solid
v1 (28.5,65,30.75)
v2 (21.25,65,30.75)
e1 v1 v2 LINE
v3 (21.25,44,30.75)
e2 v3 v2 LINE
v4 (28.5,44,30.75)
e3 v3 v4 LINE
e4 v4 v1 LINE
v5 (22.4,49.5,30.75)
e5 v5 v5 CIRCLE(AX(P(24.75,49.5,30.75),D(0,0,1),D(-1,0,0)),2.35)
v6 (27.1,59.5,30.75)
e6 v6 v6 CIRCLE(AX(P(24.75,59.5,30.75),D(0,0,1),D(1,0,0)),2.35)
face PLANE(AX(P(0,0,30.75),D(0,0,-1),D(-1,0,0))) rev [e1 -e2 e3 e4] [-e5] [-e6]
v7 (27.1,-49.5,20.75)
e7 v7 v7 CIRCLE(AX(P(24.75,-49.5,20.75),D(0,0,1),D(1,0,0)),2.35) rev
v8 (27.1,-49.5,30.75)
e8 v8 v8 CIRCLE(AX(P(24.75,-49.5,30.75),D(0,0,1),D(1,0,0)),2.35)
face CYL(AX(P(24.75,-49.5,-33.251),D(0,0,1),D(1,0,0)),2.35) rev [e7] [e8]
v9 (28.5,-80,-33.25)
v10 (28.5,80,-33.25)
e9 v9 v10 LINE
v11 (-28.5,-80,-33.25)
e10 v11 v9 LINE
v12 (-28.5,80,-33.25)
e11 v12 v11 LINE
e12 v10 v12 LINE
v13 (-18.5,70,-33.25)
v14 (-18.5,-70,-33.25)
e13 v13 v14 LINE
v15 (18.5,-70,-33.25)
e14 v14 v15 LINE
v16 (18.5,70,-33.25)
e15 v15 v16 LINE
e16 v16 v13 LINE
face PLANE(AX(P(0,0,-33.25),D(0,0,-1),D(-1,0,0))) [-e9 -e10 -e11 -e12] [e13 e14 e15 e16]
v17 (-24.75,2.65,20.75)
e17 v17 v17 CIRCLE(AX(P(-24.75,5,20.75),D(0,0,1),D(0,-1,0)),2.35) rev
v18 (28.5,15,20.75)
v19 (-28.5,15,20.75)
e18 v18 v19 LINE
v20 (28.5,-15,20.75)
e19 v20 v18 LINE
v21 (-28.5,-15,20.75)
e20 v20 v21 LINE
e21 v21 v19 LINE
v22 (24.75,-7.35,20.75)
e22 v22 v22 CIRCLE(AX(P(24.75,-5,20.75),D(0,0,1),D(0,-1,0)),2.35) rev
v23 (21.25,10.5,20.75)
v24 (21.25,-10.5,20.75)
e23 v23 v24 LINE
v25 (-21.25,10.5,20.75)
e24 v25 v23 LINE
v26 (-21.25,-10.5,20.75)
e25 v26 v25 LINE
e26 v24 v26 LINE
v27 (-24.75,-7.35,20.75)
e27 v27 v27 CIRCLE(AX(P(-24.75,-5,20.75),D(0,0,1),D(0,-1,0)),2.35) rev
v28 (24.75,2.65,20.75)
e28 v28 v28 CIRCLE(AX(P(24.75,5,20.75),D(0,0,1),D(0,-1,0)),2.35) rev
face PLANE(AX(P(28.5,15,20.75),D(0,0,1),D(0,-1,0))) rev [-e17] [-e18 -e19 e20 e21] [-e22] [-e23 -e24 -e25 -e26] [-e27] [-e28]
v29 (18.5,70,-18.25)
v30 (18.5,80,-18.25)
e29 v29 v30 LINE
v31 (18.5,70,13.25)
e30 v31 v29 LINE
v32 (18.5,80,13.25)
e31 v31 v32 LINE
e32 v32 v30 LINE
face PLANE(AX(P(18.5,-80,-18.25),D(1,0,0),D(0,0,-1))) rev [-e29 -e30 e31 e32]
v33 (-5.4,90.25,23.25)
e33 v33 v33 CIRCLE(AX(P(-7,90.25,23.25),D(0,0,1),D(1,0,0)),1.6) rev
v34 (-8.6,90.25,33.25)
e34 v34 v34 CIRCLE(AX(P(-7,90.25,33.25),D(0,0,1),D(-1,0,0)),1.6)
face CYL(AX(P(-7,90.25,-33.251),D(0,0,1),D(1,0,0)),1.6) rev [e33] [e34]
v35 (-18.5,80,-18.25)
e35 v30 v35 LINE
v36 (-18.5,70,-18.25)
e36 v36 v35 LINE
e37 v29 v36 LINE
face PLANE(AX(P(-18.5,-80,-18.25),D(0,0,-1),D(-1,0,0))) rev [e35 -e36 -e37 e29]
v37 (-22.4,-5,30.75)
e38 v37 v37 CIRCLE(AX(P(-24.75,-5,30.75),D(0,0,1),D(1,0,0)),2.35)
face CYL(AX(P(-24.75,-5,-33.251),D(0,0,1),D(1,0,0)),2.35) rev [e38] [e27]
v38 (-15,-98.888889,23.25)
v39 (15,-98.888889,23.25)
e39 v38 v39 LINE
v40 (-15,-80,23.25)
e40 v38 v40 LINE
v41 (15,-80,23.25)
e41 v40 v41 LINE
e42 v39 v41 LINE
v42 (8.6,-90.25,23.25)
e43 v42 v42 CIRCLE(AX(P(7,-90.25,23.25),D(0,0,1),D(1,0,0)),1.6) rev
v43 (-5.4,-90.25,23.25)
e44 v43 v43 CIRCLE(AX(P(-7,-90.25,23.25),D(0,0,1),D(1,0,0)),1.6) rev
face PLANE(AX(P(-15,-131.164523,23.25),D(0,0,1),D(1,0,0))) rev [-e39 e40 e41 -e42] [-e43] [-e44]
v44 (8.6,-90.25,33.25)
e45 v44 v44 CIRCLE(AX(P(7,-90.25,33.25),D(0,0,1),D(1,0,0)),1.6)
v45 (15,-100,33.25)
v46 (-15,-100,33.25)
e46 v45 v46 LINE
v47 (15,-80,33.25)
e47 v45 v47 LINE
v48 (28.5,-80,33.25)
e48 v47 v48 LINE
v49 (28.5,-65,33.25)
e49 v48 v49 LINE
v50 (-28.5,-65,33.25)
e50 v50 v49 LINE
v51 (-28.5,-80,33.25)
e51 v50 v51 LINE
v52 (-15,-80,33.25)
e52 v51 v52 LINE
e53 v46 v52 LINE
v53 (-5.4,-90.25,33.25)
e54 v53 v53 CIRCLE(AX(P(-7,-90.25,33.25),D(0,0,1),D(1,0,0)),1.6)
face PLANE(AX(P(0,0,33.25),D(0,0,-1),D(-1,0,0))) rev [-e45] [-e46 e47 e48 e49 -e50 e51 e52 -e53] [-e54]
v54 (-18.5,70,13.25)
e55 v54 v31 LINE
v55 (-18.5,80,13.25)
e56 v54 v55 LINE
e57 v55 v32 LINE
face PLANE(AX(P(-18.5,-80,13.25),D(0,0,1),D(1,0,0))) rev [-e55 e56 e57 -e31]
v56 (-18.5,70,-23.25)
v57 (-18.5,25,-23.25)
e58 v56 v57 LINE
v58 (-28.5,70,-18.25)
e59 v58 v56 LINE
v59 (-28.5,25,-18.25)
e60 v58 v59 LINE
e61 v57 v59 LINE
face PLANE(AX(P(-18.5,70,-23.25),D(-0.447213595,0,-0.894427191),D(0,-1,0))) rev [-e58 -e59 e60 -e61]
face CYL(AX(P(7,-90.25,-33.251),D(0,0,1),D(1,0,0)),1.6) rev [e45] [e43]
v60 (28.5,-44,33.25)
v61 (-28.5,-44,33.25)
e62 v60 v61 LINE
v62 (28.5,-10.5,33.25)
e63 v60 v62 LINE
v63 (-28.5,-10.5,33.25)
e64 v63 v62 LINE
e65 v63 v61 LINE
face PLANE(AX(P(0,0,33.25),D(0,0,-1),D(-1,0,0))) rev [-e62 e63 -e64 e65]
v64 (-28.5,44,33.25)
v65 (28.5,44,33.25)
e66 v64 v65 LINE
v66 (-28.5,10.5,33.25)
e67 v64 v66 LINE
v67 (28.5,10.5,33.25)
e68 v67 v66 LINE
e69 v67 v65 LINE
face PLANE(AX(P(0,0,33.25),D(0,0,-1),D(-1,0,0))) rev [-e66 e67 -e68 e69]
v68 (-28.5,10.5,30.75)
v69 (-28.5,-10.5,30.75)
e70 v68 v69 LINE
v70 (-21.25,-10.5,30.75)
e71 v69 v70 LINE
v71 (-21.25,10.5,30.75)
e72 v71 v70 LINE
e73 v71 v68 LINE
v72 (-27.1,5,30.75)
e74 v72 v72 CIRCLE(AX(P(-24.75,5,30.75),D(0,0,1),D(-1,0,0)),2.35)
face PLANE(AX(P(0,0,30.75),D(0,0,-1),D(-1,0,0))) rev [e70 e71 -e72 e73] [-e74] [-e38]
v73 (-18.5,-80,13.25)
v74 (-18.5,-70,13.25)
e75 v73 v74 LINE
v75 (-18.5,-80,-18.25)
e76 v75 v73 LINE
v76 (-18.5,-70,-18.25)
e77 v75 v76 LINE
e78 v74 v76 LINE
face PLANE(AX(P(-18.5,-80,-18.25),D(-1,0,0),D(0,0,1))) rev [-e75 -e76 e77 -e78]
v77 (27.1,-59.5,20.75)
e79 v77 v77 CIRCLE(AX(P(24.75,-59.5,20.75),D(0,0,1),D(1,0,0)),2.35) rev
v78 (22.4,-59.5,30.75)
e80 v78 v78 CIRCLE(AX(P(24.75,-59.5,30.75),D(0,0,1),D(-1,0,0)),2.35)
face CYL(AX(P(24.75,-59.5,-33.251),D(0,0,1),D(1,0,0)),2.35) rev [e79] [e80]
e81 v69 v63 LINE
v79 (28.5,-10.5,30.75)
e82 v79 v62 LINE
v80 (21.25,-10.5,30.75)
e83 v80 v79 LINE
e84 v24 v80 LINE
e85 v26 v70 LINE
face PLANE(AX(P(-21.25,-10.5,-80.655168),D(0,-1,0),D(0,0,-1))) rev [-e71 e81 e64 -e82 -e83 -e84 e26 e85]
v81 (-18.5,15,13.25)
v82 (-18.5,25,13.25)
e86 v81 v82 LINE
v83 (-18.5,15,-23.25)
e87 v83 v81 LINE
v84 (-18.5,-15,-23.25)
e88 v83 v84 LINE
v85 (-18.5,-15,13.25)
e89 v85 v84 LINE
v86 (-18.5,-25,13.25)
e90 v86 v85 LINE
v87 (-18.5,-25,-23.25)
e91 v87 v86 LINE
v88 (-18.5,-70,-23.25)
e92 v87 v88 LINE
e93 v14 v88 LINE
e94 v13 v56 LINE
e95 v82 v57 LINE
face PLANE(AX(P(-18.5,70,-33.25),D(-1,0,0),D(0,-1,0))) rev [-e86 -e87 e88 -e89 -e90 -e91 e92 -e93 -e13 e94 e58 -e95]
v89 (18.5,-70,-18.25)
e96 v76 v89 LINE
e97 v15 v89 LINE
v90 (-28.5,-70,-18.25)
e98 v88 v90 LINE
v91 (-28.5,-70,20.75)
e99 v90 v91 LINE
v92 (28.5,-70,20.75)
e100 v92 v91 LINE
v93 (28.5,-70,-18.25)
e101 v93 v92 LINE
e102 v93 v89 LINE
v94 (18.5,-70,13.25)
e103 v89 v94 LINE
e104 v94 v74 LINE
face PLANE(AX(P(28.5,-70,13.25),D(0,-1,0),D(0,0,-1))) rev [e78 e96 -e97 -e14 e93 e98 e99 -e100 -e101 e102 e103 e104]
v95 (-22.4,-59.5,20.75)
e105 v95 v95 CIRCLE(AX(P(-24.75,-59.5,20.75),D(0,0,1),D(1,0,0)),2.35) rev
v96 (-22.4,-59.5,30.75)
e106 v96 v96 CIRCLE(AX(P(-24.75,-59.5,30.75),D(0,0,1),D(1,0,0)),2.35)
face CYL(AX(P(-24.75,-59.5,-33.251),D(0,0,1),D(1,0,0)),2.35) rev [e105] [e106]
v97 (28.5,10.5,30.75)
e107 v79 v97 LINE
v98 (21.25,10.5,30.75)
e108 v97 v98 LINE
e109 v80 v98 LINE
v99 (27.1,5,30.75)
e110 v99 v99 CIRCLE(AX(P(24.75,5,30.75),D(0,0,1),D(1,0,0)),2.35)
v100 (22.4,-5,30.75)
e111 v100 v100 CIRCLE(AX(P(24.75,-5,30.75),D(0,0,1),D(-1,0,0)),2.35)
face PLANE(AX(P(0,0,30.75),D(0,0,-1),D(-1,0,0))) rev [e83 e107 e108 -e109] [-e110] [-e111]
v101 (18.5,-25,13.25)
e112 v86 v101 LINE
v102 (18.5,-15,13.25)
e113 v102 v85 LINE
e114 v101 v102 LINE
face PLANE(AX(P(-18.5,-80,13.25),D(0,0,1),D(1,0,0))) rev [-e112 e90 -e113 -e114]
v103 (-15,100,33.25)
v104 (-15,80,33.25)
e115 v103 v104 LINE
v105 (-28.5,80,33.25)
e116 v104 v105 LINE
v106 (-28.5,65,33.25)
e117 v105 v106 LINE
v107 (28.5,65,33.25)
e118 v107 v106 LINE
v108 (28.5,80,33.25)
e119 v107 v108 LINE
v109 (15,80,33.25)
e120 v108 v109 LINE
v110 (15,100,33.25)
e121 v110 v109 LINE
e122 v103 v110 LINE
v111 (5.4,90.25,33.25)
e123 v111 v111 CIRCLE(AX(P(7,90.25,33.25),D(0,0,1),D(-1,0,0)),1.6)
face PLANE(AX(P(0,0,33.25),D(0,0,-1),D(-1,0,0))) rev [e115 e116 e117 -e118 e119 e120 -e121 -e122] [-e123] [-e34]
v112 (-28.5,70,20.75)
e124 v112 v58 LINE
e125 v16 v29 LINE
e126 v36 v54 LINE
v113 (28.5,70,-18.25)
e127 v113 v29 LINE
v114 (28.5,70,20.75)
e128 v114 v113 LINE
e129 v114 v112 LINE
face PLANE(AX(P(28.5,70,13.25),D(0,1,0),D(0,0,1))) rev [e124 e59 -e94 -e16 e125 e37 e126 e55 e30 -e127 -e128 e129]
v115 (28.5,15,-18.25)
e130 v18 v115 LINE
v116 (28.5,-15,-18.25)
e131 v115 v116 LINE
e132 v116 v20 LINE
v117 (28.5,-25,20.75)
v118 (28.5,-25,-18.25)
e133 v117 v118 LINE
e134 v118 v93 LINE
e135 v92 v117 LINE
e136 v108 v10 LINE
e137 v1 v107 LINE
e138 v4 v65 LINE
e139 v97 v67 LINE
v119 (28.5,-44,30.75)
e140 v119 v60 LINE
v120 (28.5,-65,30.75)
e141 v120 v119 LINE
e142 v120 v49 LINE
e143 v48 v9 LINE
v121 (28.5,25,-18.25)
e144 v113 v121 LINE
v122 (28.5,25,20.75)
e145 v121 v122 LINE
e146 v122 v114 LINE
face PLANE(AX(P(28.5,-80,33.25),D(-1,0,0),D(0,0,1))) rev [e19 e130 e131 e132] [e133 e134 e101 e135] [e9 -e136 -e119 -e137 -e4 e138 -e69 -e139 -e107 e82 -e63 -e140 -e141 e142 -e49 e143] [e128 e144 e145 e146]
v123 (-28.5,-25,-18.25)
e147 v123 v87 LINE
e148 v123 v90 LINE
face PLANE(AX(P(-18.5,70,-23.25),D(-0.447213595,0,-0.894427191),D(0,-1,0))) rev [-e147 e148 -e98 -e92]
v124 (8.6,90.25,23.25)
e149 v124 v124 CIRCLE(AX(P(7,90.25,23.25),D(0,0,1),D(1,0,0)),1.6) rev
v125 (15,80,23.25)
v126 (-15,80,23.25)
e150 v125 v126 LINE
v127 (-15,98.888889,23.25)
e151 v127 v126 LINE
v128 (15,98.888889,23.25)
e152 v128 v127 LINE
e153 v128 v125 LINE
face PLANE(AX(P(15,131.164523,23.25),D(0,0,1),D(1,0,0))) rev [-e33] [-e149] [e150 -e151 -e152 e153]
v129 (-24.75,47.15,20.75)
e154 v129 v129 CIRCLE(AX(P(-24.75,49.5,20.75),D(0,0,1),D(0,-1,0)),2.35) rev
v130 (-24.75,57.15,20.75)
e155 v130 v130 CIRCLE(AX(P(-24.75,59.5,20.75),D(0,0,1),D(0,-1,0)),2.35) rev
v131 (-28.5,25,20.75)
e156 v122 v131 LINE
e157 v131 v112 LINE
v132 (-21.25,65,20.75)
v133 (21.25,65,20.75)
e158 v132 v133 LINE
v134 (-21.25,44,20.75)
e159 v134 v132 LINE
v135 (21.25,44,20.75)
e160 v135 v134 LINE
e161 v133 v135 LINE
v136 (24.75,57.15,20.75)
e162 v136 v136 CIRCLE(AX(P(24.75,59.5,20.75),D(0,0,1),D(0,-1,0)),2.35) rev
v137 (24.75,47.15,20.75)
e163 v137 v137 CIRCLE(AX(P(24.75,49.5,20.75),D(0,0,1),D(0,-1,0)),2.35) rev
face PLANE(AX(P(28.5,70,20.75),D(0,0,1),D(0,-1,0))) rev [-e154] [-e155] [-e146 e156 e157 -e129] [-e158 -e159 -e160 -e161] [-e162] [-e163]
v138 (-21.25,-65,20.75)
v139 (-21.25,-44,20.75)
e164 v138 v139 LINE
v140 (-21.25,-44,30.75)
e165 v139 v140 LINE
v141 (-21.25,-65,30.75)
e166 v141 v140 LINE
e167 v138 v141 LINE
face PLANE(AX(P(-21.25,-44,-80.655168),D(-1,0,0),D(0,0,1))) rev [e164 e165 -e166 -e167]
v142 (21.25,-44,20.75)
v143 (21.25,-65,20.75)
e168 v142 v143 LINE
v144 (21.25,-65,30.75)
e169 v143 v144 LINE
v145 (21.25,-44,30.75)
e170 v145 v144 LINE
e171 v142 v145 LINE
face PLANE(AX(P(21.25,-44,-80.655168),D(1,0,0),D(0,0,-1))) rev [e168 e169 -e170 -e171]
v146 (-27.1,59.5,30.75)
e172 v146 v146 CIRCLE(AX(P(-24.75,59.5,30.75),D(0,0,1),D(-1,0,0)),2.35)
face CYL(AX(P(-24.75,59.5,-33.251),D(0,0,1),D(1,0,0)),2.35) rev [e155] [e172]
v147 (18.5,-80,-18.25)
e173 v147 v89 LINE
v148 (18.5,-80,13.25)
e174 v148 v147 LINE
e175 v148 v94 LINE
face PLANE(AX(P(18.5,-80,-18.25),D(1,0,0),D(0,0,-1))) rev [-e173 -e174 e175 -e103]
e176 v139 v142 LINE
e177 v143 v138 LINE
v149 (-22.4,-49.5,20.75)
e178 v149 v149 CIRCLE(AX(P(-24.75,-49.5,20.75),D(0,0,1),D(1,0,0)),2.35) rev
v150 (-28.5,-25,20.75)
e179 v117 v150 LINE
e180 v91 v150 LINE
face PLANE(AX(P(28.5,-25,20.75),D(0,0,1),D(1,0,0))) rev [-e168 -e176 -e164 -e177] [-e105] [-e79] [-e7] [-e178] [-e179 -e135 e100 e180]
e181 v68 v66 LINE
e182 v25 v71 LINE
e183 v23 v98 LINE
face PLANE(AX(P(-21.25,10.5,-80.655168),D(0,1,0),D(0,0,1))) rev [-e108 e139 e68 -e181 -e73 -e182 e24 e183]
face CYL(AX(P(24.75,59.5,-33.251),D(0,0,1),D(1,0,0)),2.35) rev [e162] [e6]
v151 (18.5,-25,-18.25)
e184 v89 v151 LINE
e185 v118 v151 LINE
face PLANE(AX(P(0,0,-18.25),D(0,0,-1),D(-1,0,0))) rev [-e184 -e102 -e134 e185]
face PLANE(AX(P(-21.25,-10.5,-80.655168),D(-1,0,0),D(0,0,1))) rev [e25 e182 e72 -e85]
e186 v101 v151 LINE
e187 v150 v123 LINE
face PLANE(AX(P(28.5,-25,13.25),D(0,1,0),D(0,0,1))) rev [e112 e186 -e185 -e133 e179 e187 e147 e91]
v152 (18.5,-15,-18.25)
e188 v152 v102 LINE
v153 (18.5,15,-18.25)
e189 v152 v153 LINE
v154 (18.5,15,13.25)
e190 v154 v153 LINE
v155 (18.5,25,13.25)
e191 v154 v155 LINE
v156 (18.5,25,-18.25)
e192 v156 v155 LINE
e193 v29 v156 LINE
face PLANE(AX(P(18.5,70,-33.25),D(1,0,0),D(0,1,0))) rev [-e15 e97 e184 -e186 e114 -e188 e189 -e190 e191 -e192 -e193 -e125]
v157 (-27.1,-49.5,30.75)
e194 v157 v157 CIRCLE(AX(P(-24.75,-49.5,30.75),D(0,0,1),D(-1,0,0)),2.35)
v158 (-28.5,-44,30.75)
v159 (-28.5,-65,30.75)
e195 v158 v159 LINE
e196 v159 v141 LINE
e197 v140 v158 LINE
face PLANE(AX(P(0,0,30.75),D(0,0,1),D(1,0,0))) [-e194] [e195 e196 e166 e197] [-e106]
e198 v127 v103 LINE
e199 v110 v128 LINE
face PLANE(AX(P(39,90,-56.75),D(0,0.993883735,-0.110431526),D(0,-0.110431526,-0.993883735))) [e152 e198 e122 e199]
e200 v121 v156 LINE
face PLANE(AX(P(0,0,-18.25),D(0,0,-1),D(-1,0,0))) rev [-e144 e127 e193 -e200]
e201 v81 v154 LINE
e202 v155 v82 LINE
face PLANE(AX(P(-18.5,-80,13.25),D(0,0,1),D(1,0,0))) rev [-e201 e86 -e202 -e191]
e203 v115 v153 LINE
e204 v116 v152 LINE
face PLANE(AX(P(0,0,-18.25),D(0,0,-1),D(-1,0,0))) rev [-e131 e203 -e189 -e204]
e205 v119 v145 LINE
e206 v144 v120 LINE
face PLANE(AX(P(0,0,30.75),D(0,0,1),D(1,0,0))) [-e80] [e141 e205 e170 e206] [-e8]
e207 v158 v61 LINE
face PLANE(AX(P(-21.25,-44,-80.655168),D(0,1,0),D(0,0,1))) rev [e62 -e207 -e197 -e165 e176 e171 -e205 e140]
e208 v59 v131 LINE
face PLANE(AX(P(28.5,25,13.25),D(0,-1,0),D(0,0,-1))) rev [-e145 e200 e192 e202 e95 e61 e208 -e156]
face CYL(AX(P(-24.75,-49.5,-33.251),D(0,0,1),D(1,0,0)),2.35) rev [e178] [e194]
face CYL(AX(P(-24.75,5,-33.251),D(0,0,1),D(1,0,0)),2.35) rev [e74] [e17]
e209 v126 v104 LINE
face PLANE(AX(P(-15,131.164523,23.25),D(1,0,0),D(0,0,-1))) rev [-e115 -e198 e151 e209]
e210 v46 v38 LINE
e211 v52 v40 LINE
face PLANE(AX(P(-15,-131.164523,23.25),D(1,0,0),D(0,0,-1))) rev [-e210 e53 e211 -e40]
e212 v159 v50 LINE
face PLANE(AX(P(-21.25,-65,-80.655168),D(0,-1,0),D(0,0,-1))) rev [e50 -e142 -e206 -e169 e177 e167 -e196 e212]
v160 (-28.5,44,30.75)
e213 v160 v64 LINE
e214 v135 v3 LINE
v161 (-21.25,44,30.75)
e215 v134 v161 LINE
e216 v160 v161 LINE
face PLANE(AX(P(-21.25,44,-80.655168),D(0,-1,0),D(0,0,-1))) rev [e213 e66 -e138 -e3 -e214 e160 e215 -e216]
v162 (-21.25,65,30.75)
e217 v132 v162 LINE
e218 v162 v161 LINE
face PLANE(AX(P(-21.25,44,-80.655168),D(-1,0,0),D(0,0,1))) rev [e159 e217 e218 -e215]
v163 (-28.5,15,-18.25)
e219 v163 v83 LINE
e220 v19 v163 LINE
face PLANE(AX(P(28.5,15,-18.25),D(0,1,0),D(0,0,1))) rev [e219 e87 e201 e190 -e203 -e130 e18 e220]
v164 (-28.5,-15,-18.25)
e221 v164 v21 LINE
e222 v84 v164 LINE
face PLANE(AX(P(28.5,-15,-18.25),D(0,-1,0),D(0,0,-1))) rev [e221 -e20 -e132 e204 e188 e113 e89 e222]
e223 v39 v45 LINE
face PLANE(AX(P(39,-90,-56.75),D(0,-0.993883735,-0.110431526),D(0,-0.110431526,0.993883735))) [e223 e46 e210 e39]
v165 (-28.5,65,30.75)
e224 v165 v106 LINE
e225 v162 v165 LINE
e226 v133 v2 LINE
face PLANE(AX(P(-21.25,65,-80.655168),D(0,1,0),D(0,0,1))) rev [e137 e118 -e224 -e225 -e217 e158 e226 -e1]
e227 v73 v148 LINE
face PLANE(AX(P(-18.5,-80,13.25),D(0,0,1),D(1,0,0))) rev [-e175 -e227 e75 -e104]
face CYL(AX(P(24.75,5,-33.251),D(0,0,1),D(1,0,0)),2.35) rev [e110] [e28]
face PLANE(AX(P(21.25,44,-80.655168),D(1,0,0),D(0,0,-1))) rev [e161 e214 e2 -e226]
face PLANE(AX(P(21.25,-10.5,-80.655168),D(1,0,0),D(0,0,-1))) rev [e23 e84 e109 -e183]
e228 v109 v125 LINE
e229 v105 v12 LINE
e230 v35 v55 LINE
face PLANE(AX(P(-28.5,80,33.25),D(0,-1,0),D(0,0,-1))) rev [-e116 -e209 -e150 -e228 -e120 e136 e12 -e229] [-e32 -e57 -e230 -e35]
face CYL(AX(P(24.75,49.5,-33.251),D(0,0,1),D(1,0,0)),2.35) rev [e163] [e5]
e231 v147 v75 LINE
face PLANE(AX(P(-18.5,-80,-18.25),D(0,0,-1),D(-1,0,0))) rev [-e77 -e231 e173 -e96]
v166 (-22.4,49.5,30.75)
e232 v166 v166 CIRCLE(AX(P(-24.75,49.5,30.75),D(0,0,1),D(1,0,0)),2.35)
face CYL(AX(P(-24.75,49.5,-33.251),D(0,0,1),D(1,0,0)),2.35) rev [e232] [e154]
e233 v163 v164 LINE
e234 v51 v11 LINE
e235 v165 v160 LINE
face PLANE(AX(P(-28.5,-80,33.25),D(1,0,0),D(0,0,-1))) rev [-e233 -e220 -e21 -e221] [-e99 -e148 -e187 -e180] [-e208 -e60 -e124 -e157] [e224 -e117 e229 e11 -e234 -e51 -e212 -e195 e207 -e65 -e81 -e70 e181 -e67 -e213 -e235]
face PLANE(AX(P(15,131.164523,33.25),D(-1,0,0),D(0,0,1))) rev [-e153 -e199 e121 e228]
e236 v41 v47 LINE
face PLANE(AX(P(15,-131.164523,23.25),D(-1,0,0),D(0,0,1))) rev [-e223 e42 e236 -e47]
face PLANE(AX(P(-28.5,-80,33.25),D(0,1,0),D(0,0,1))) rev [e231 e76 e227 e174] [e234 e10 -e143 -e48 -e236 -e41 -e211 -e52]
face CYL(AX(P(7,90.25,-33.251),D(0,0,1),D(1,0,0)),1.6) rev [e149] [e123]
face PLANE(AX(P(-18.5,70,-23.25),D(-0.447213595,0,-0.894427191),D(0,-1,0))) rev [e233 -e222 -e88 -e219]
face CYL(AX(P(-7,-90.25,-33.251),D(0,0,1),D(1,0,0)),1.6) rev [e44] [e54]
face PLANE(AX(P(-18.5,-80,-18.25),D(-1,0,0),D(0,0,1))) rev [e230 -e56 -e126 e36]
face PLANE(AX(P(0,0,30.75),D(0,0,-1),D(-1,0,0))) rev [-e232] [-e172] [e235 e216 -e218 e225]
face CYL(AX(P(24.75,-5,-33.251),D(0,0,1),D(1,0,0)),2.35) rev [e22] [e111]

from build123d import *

# Parameters (mm, degrees)
SKETCH1_W           = 57
SKETCH1_H           = 160
BOSS_EXTRUDE1_DEPTH = 33.25
SKETCH2_W           = 42.5
SKETCH2_H           = 21
CUT_EXTRUDE1_DEPTH  = 51.5
SKETCH3_W           = 31.5
SKETCH3_H           = 45
SKETCH3_H_2         = 30
CUT_EXTRUDE2_DEPTH  = 104.704206761
SKETCH4_W           = 37
SKETCH4_H           = 140
CUT_EXTRUDE3_DEPTH  = 100.320189287
SKETCH5_W           = 57
SKETCH5_H           = 21
CUT_EXTRUDE4_DEPTH  = 2.5
SKETCH37_W          = 39
SKETCH37_H          = 45
SKETCH37_H_2        = 30
CUT_EXTRUDE10_DEPTH = 104.704206761
CUT_EXTRUDE6_REACH  = 108.34
SKETCH6_R           = 2.35
SKETCH8_W           = 37
SKETCH8_H           = 31.5
CUT_EXTRUDE7_DEPTH  = 166.884937532
BOSS_EXTRUDE3_REACH = 167.885
SKETCH11_W          = 30
SKETCH11_H          = 10
BOSS_EXTRUDE4_REACH = 187.251
SKETCH13_W          = 30
SKETCH13_H          = 10
CUT_EXTRUDE9_REACH  = 125.428
SKETCH12_R          = 1.6
CHAMFER1_SIZE       = 10
CHAMFER1_SIZE_2     = 5


with BuildPart() as part:
    # Sketch1 → Boss-Extrude1 (new, symmetric)
    with BuildSketch(Plane.XY):
        Rectangle(SKETCH1_W, SKETCH1_H)
    extrude(amount=BOSS_EXTRUDE1_DEPTH, both=True)

    # Sketch2 → Cut-Extrude1 (cut)
    with BuildSketch(Plane.XY.offset(33.25)):
        with Locations((0, 54.5)):
            Rectangle(SKETCH2_W, SKETCH2_H)
        Rectangle(SKETCH2_W, SKETCH2_H)
        with Locations((0, -54.5)):
            Rectangle(SKETCH2_W, SKETCH2_H)
    extrude(amount=-CUT_EXTRUDE1_DEPTH, mode=Mode.SUBTRACT)

    # Sketch3 → Cut-Extrude2 (cut, through all)
    with BuildSketch(Plane.ZY.offset(28.5)):
        with Locations((-2.5, -47.5)):
            Rectangle(SKETCH3_W, SKETCH3_H)
        with Locations((-2.5, 0)):
            Rectangle(SKETCH3_W, SKETCH3_H_2)
        with Locations((-2.5, 47.5)):
            Rectangle(SKETCH3_W, SKETCH3_H)
    extrude(amount=-CUT_EXTRUDE2_DEPTH, mode=Mode.SUBTRACT)

    # Sketch4 → Cut-Extrude3 (cut, through all)
    with BuildSketch(Plane.XY.offset(-18.25)):
        Rectangle(SKETCH4_W, SKETCH4_H)
    extrude(amount=-CUT_EXTRUDE3_DEPTH, mode=Mode.SUBTRACT)

    # Sketch5 → Cut-Extrude4 (cut)
    with BuildSketch(Plane.XY.offset(33.25)):
        Rectangle(SKETCH5_W, SKETCH5_H)
        with Locations((0, 54.5)):
            Rectangle(SKETCH5_W, SKETCH5_H)
        with Locations((0, -54.5)):
            Rectangle(SKETCH5_W, SKETCH5_H)
    extrude(amount=-CUT_EXTRUDE4_DEPTH, mode=Mode.SUBTRACT)

    # Sketch37 → Cut-Extrude10 (cut, through all)
    with BuildSketch(Plane.ZY.offset(28.5)):
        with Locations((1.25, 47.5)):
            Rectangle(SKETCH37_W, SKETCH37_H)
        with Locations((1.25, 0)):
            Rectangle(SKETCH37_W, SKETCH37_H_2)
        with Locations((1.25, -47.5)):
            Rectangle(SKETCH37_W, SKETCH37_H)
    extrude(amount=-CUT_EXTRUDE10_DEPTH, mode=Mode.SUBTRACT)

    # Sketch6 → Cut-Extrude6 (cut, up to next)
    with BuildSketch(Plane.XY.offset(30.75), mode=Mode.PRIVATE) as cut_extrude6_sk1:
        with Locations((24.75, 5)):
            Circle(SKETCH6_R)
    cut_extrude6_tool1 = extrude(cut_extrude6_sk1.sketch, amount=-CUT_EXTRUDE6_REACH, mode=Mode.PRIVATE) & part.part
    # Sketch6 → Cut-Extrude6 (cut, up to next)
    with BuildSketch(Plane.XY.offset(30.75), mode=Mode.PRIVATE) as cut_extrude6_sk2:
        with Locations(Location((-24.75, 5, 0), (0, 0, 270))):
            Circle(SKETCH6_R)
    cut_extrude6_tool2 = extrude(cut_extrude6_sk2.sketch, amount=-CUT_EXTRUDE6_REACH, mode=Mode.PRIVATE) & part.part
    # Sketch6 → Cut-Extrude6 (cut, up to next)
    with BuildSketch(Plane.XY.offset(30.75), mode=Mode.PRIVATE) as cut_extrude6_sk3:
        with Locations((-24.75, -5)):
            Circle(SKETCH6_R)
    cut_extrude6_tool3 = extrude(cut_extrude6_sk3.sketch, amount=-CUT_EXTRUDE6_REACH, mode=Mode.PRIVATE) & part.part
    # Sketch6 → Cut-Extrude6 (cut, up to next)
    with BuildSketch(Plane.XY.offset(30.75), mode=Mode.PRIVATE) as cut_extrude6_sk4:
        with Locations(Location((24.75, -5, 0), (0, 0, 270))):
            Circle(SKETCH6_R)
    cut_extrude6_tool4 = extrude(cut_extrude6_sk4.sketch, amount=-CUT_EXTRUDE6_REACH, mode=Mode.PRIVATE) & part.part
    # Sketch6 → Cut-Extrude6 (cut, up to next)
    with BuildSketch(Plane.XY.offset(30.75), mode=Mode.PRIVATE) as cut_extrude6_sk5:
        with Locations((24.75, 59.5)):
            Circle(SKETCH6_R)
    cut_extrude6_tool5 = extrude(cut_extrude6_sk5.sketch, amount=-CUT_EXTRUDE6_REACH, mode=Mode.PRIVATE) & part.part
    # Sketch6 → Cut-Extrude6 (cut, up to next)
    with BuildSketch(Plane.XY.offset(30.75), mode=Mode.PRIVATE) as cut_extrude6_sk6:
        with Locations(Location((-24.75, 59.5, 0), (0, 0, 270))):
            Circle(SKETCH6_R)
    cut_extrude6_tool6 = extrude(cut_extrude6_sk6.sketch, amount=-CUT_EXTRUDE6_REACH, mode=Mode.PRIVATE) & part.part
    # Sketch6 → Cut-Extrude6 (cut, up to next)
    with BuildSketch(Plane.XY.offset(30.75), mode=Mode.PRIVATE) as cut_extrude6_sk7:
        with Locations((-24.75, 49.5)):
            Circle(SKETCH6_R)
    cut_extrude6_tool7 = extrude(cut_extrude6_sk7.sketch, amount=-CUT_EXTRUDE6_REACH, mode=Mode.PRIVATE) & part.part
    # Sketch6 → Cut-Extrude6 (cut, up to next)
    with BuildSketch(Plane.XY.offset(30.75), mode=Mode.PRIVATE) as cut_extrude6_sk8:
        with Locations(Location((24.75, 49.5, 0), (0, 0, 270))):
            Circle(SKETCH6_R)
    cut_extrude6_tool8 = extrude(cut_extrude6_sk8.sketch, amount=-CUT_EXTRUDE6_REACH, mode=Mode.PRIVATE) & part.part
    # Sketch6 → Cut-Extrude6 (cut, up to next)
    with BuildSketch(Plane.XY.offset(30.75), mode=Mode.PRIVATE) as cut_extrude6_sk9:
        with Locations((24.75, -49.5)):
            Circle(SKETCH6_R)
    cut_extrude6_tool9 = extrude(cut_extrude6_sk9.sketch, amount=-CUT_EXTRUDE6_REACH, mode=Mode.PRIVATE) & part.part
    # Sketch6 → Cut-Extrude6 (cut, up to next)
    with BuildSketch(Plane.XY.offset(30.75), mode=Mode.PRIVATE) as cut_extrude6_sk10:
        with Locations((-24.75, -49.5)):
            Circle(SKETCH6_R)
    cut_extrude6_tool10 = extrude(cut_extrude6_sk10.sketch, amount=-CUT_EXTRUDE6_REACH, mode=Mode.PRIVATE) & part.part
    # Sketch6 → Cut-Extrude6 (cut, up to next)
    with BuildSketch(Plane.XY.offset(30.75), mode=Mode.PRIVATE) as cut_extrude6_sk11:
        with Locations((-24.75, -59.5)):
            Circle(SKETCH6_R)
    cut_extrude6_tool11 = extrude(cut_extrude6_sk11.sketch, amount=-CUT_EXTRUDE6_REACH, mode=Mode.PRIVATE) & part.part
    # Sketch6 → Cut-Extrude6 (cut, up to next)
    with BuildSketch(Plane.XY.offset(30.75), mode=Mode.PRIVATE) as cut_extrude6_sk12:
        with Locations((24.75, -59.5)):
            Circle(SKETCH6_R)
    cut_extrude6_tool12 = extrude(cut_extrude6_sk12.sketch, amount=-CUT_EXTRUDE6_REACH, mode=Mode.PRIVATE) & part.part
    add(cut_extrude6_tool1.solids().sort_by_distance((24.75, 5, 30.75))[0], mode=Mode.SUBTRACT)
    add(cut_extrude6_tool2.solids().sort_by_distance((-24.75, 5, 30.75))[0], mode=Mode.SUBTRACT)
    add(cut_extrude6_tool3.solids().sort_by_distance((-24.75, -5, 30.75))[0], mode=Mode.SUBTRACT)
    add(cut_extrude6_tool4.solids().sort_by_distance((24.75, -5, 30.75))[0], mode=Mode.SUBTRACT)
    add(cut_extrude6_tool5.solids().sort_by_distance((24.75, 59.5, 30.75))[0], mode=Mode.SUBTRACT)
    add(cut_extrude6_tool6.solids().sort_by_distance((-24.75, 59.5, 30.75))[0], mode=Mode.SUBTRACT)
    add(cut_extrude6_tool7.solids().sort_by_distance((-24.75, 49.5, 30.75))[0], mode=Mode.SUBTRACT)
    add(cut_extrude6_tool8.solids().sort_by_distance((24.75, 49.5, 30.75))[0], mode=Mode.SUBTRACT)
    add(cut_extrude6_tool9.solids().sort_by_distance((24.75, -49.5, 30.75))[0], mode=Mode.SUBTRACT)
    add(cut_extrude6_tool10.solids().sort_by_distance((-24.75, -49.5, 30.75))[0], mode=Mode.SUBTRACT)
    add(cut_extrude6_tool11.solids().sort_by_distance((-24.75, -59.5, 30.75))[0], mode=Mode.SUBTRACT)
    add(cut_extrude6_tool12.solids().sort_by_distance((24.75, -59.5, 30.75))[0], mode=Mode.SUBTRACT)

    # Sketch8 → Cut-Extrude7 (cut, through all)
    with BuildSketch(Plane(origin=(0, 80, 0), x_dir=(1, 0, 0), z_dir=(0, 1, 0))):
        with Locations((0, 2.5)):
            Rectangle(SKETCH8_W, SKETCH8_H)
    extrude(amount=-CUT_EXTRUDE7_DEPTH, mode=Mode.SUBTRACT)

    # Boss-Extrude3: up to this plane
    boss_extrude3_end = Plane(origin=(39, -90, -56.75), z_dir=(0, -0.9938837346736189, -0.1104315260748466))
    # Sketch11 → Boss-Extrude3 (add, up to the surface)
    with BuildSketch(Plane.XZ.offset(80), mode=Mode.PRIVATE) as boss_extrude3_sk1:
        with Locations((0, 28.25)):
            Rectangle(SKETCH11_W, SKETCH11_H)
    boss_extrude3_tool1 = split(extrude(boss_extrude3_sk1.sketch, amount=BOSS_EXTRUDE3_REACH, mode=Mode.PRIVATE), bisect_by=boss_extrude3_end, keep=Keep.BOTH, mode=Mode.PRIVATE)
    add(boss_extrude3_tool1.solids().sort_by_distance((0, -80, 28.25))[0])

    # Boss-Extrude4: up to this plane
    boss_extrude4_end = Plane(origin=(39, 90, -56.75), z_dir=(0, 0.9938837346736189, -0.1104315260748466))
    # Sketch13 → Boss-Extrude4 (add, up to the surface)
    with BuildSketch(Plane(origin=(0, 80, 0), x_dir=(1, 0, 0), z_dir=(0, 1, 0)), mode=Mode.PRIVATE) as boss_extrude4_sk1:
        with Locations((0, -28.25)):
            Rectangle(SKETCH13_W, SKETCH13_H)
    boss_extrude4_tool1 = split(extrude(boss_extrude4_sk1.sketch, amount=BOSS_EXTRUDE4_REACH, mode=Mode.PRIVATE), bisect_by=boss_extrude4_end, keep=Keep.BOTH, mode=Mode.PRIVATE)
    add(boss_extrude4_tool1.solids().sort_by_distance((0, 80, 28.25))[0])

    # Sketch12 → Cut-Extrude9 (cut, up to next)
    with BuildSketch(Plane.XY.offset(33.25), mode=Mode.PRIVATE) as cut_extrude9_sk1:
        with Locations((7, -90.25)):
            Circle(SKETCH12_R)
    cut_extrude9_tool1 = extrude(cut_extrude9_sk1.sketch, amount=-CUT_EXTRUDE9_REACH, mode=Mode.PRIVATE) & part.part
    # Sketch12 → Cut-Extrude9 (cut, up to next)
    with BuildSketch(Plane.XY.offset(33.25), mode=Mode.PRIVATE) as cut_extrude9_sk2:
        with Locations((7, 90.25)):
            Circle(SKETCH12_R)
    cut_extrude9_tool2 = extrude(cut_extrude9_sk2.sketch, amount=-CUT_EXTRUDE9_REACH, mode=Mode.PRIVATE) & part.part
    # Sketch12 → Cut-Extrude9 (cut, up to next)
    with BuildSketch(Plane.XY.offset(33.25), mode=Mode.PRIVATE) as cut_extrude9_sk3:
        with Locations((-7, -90.25)):
            Circle(SKETCH12_R)
    cut_extrude9_tool3 = extrude(cut_extrude9_sk3.sketch, amount=-CUT_EXTRUDE9_REACH, mode=Mode.PRIVATE) & part.part
    # Sketch12 → Cut-Extrude9 (cut, up to next)
    with BuildSketch(Plane.XY.offset(33.25), mode=Mode.PRIVATE) as cut_extrude9_sk4:
        with Locations((-7, 90.25)):
            Circle(SKETCH12_R)
    cut_extrude9_tool4 = extrude(cut_extrude9_sk4.sketch, amount=-CUT_EXTRUDE9_REACH, mode=Mode.PRIVATE) & part.part
    add(cut_extrude9_tool1.solids().sort_by_distance((7, -90.25, 33.25))[0], mode=Mode.SUBTRACT)
    add(cut_extrude9_tool2.solids().sort_by_distance((7, 90.25, 33.25))[0], mode=Mode.SUBTRACT)
    add(cut_extrude9_tool3.solids().sort_by_distance((-7, -90.25, 33.25))[0], mode=Mode.SUBTRACT)
    add(cut_extrude9_tool4.solids().sort_by_distance((-7, 90.25, 33.25))[0], mode=Mode.SUBTRACT)

    # Chamfer1
    # the kernel refuses this chamfer: 10, 5 mm, written as the material it adds along each edge
    # the kernel refuses this chamfer: 10, 5 mm, written as the material it takes off along each edge
    with BuildSketch(Plane(origin=(-18.5, 70, -18.25), x_dir=(-0.9998508956747119, 0, 0.01726807512366821), z_dir=(0, -1, 0)), Plane(origin=(-18.5, -25, -18.25), x_dir=(-0.9998508956747119, 0, 0.01726807512366821), z_dir=(0, -1, 0))) as chamfer1_2_piece_1:
        Polygon((CHAMFER1_SIZE * 0.999850895675, CHAMFER1_SIZE * 0.0172680751237), (-CHAMFER1_SIZE_2 * 0.0172680751237, CHAMFER1_SIZE_2 * 0.999850895675), (0, 0), align=None)
    extrude(amount=45, mode=Mode.SUBTRACT)
    with BuildSketch(Plane(origin=(-18.5, 95.898288738, -18.25), x_dir=(-0.9998508956747119, 0, 0.01726807512366821), z_dir=(0, -1, 0))) as chamfer1_2_piece_2_section:
        Polygon((CHAMFER1_SIZE * 0.999850895675, CHAMFER1_SIZE * 0.0172680751237), (-CHAMFER1_SIZE_2 * 0.0172680751237, CHAMFER1_SIZE_2 * 0.999850895675), (0, 0), align=None)
    chamfer1_2_piece_2 = extrude(amount=96.796577476, mode=Mode.PRIVATE)
    chamfer1_2_piece_2 = split(chamfer1_2_piece_2, bisect_by=Plane(origin=(-21.833333333, 15, -19.916666667), z_dir=(0, -1, 0)), keep=Keep.TOP, mode=Mode.PRIVATE)
    add(chamfer1_2_piece_2, mode=Mode.SUBTRACT)
    with BuildSketch(Plane(origin=(-18.5, 0.898288738, -18.25), x_dir=(-0.9998508956747119, 0, 0.01726807512366821), z_dir=(0, -1, 0))) as chamfer1_2_piece_3_section:
        Polygon((CHAMFER1_SIZE * 0.999850895675, CHAMFER1_SIZE * 0.0172680751237), (-CHAMFER1_SIZE_2 * 0.0172680751237, CHAMFER1_SIZE_2 * 0.999850895675), (0, 0), align=None)
    chamfer1_2_piece_3 = extrude(amount=96.796577476, mode=Mode.PRIVATE)
    chamfer1_2_piece_3 = split(chamfer1_2_piece_3, bisect_by=Plane(origin=(-21.833333333, -15, -19.916666667), z_dir=(0, 1, 0)), keep=Keep.TOP, mode=Mode.PRIVATE)
    add(chamfer1_2_piece_3, mode=Mode.SUBTRACT)
    with BuildSketch(Plane(origin=(-18.5, 40.898288738, -18.25), x_dir=(-0.9998508956747119, 0, 0.01726807512366821), z_dir=(0, -1, 0))) as chamfer1_2_piece_4_section:
        Polygon((CHAMFER1_SIZE * 0.999850895675, CHAMFER1_SIZE * 0.0172680751237), (-CHAMFER1_SIZE_2 * 0.0172680751237, CHAMFER1_SIZE_2 * 0.999850895675), (0, 0), align=None)
    chamfer1_2_piece_4 = extrude(amount=81.796577476, mode=Mode.PRIVATE)
    chamfer1_2_piece_4 = split(chamfer1_2_piece_4, bisect_by=Plane(origin=(-21.833333333, 25, -19.916666667), z_dir=(0, 1, 0)), keep=Keep.TOP, mode=Mode.PRIVATE)
    add(chamfer1_2_piece_4, mode=Mode.SUBTRACT)
    with BuildSketch(Plane(origin=(-18.5, 15, -18.25), x_dir=(-0.9998508956747119, 0, 0.01726807512366821), z_dir=(0, -1, 0))) as chamfer1_2_piece_5:
        Polygon((CHAMFER1_SIZE * 0.999850895675, CHAMFER1_SIZE * 0.0172680751237), (-CHAMFER1_SIZE_2 * 0.0172680751237, CHAMFER1_SIZE_2 * 0.999850895675), (0, 0), align=None)
    extrude(amount=30, mode=Mode.SUBTRACT)
    with BuildSketch(Plane(origin=(-18.5, 40.898288738, -18.25), x_dir=(-0.9998508956747119, 0, 0.01726807512366821), z_dir=(0, -1, 0))) as chamfer1_2_piece_6_section:
        Polygon((CHAMFER1_SIZE * 0.999850895675, CHAMFER1_SIZE * 0.0172680751237), (-CHAMFER1_SIZE_2 * 0.0172680751237, CHAMFER1_SIZE_2 * 0.999850895675), (0, 0), align=None)
    chamfer1_2_piece_6 = extrude(amount=81.796577476, mode=Mode.PRIVATE)
    chamfer1_2_piece_6 = split(chamfer1_2_piece_6, bisect_by=Plane(origin=(-21.833333333, -25, -19.916666667), z_dir=(0, -1, 0)), keep=Keep.TOP, mode=Mode.PRIVATE)
    add(chamfer1_2_piece_6, mode=Mode.SUBTRACT)


solid = part.part
